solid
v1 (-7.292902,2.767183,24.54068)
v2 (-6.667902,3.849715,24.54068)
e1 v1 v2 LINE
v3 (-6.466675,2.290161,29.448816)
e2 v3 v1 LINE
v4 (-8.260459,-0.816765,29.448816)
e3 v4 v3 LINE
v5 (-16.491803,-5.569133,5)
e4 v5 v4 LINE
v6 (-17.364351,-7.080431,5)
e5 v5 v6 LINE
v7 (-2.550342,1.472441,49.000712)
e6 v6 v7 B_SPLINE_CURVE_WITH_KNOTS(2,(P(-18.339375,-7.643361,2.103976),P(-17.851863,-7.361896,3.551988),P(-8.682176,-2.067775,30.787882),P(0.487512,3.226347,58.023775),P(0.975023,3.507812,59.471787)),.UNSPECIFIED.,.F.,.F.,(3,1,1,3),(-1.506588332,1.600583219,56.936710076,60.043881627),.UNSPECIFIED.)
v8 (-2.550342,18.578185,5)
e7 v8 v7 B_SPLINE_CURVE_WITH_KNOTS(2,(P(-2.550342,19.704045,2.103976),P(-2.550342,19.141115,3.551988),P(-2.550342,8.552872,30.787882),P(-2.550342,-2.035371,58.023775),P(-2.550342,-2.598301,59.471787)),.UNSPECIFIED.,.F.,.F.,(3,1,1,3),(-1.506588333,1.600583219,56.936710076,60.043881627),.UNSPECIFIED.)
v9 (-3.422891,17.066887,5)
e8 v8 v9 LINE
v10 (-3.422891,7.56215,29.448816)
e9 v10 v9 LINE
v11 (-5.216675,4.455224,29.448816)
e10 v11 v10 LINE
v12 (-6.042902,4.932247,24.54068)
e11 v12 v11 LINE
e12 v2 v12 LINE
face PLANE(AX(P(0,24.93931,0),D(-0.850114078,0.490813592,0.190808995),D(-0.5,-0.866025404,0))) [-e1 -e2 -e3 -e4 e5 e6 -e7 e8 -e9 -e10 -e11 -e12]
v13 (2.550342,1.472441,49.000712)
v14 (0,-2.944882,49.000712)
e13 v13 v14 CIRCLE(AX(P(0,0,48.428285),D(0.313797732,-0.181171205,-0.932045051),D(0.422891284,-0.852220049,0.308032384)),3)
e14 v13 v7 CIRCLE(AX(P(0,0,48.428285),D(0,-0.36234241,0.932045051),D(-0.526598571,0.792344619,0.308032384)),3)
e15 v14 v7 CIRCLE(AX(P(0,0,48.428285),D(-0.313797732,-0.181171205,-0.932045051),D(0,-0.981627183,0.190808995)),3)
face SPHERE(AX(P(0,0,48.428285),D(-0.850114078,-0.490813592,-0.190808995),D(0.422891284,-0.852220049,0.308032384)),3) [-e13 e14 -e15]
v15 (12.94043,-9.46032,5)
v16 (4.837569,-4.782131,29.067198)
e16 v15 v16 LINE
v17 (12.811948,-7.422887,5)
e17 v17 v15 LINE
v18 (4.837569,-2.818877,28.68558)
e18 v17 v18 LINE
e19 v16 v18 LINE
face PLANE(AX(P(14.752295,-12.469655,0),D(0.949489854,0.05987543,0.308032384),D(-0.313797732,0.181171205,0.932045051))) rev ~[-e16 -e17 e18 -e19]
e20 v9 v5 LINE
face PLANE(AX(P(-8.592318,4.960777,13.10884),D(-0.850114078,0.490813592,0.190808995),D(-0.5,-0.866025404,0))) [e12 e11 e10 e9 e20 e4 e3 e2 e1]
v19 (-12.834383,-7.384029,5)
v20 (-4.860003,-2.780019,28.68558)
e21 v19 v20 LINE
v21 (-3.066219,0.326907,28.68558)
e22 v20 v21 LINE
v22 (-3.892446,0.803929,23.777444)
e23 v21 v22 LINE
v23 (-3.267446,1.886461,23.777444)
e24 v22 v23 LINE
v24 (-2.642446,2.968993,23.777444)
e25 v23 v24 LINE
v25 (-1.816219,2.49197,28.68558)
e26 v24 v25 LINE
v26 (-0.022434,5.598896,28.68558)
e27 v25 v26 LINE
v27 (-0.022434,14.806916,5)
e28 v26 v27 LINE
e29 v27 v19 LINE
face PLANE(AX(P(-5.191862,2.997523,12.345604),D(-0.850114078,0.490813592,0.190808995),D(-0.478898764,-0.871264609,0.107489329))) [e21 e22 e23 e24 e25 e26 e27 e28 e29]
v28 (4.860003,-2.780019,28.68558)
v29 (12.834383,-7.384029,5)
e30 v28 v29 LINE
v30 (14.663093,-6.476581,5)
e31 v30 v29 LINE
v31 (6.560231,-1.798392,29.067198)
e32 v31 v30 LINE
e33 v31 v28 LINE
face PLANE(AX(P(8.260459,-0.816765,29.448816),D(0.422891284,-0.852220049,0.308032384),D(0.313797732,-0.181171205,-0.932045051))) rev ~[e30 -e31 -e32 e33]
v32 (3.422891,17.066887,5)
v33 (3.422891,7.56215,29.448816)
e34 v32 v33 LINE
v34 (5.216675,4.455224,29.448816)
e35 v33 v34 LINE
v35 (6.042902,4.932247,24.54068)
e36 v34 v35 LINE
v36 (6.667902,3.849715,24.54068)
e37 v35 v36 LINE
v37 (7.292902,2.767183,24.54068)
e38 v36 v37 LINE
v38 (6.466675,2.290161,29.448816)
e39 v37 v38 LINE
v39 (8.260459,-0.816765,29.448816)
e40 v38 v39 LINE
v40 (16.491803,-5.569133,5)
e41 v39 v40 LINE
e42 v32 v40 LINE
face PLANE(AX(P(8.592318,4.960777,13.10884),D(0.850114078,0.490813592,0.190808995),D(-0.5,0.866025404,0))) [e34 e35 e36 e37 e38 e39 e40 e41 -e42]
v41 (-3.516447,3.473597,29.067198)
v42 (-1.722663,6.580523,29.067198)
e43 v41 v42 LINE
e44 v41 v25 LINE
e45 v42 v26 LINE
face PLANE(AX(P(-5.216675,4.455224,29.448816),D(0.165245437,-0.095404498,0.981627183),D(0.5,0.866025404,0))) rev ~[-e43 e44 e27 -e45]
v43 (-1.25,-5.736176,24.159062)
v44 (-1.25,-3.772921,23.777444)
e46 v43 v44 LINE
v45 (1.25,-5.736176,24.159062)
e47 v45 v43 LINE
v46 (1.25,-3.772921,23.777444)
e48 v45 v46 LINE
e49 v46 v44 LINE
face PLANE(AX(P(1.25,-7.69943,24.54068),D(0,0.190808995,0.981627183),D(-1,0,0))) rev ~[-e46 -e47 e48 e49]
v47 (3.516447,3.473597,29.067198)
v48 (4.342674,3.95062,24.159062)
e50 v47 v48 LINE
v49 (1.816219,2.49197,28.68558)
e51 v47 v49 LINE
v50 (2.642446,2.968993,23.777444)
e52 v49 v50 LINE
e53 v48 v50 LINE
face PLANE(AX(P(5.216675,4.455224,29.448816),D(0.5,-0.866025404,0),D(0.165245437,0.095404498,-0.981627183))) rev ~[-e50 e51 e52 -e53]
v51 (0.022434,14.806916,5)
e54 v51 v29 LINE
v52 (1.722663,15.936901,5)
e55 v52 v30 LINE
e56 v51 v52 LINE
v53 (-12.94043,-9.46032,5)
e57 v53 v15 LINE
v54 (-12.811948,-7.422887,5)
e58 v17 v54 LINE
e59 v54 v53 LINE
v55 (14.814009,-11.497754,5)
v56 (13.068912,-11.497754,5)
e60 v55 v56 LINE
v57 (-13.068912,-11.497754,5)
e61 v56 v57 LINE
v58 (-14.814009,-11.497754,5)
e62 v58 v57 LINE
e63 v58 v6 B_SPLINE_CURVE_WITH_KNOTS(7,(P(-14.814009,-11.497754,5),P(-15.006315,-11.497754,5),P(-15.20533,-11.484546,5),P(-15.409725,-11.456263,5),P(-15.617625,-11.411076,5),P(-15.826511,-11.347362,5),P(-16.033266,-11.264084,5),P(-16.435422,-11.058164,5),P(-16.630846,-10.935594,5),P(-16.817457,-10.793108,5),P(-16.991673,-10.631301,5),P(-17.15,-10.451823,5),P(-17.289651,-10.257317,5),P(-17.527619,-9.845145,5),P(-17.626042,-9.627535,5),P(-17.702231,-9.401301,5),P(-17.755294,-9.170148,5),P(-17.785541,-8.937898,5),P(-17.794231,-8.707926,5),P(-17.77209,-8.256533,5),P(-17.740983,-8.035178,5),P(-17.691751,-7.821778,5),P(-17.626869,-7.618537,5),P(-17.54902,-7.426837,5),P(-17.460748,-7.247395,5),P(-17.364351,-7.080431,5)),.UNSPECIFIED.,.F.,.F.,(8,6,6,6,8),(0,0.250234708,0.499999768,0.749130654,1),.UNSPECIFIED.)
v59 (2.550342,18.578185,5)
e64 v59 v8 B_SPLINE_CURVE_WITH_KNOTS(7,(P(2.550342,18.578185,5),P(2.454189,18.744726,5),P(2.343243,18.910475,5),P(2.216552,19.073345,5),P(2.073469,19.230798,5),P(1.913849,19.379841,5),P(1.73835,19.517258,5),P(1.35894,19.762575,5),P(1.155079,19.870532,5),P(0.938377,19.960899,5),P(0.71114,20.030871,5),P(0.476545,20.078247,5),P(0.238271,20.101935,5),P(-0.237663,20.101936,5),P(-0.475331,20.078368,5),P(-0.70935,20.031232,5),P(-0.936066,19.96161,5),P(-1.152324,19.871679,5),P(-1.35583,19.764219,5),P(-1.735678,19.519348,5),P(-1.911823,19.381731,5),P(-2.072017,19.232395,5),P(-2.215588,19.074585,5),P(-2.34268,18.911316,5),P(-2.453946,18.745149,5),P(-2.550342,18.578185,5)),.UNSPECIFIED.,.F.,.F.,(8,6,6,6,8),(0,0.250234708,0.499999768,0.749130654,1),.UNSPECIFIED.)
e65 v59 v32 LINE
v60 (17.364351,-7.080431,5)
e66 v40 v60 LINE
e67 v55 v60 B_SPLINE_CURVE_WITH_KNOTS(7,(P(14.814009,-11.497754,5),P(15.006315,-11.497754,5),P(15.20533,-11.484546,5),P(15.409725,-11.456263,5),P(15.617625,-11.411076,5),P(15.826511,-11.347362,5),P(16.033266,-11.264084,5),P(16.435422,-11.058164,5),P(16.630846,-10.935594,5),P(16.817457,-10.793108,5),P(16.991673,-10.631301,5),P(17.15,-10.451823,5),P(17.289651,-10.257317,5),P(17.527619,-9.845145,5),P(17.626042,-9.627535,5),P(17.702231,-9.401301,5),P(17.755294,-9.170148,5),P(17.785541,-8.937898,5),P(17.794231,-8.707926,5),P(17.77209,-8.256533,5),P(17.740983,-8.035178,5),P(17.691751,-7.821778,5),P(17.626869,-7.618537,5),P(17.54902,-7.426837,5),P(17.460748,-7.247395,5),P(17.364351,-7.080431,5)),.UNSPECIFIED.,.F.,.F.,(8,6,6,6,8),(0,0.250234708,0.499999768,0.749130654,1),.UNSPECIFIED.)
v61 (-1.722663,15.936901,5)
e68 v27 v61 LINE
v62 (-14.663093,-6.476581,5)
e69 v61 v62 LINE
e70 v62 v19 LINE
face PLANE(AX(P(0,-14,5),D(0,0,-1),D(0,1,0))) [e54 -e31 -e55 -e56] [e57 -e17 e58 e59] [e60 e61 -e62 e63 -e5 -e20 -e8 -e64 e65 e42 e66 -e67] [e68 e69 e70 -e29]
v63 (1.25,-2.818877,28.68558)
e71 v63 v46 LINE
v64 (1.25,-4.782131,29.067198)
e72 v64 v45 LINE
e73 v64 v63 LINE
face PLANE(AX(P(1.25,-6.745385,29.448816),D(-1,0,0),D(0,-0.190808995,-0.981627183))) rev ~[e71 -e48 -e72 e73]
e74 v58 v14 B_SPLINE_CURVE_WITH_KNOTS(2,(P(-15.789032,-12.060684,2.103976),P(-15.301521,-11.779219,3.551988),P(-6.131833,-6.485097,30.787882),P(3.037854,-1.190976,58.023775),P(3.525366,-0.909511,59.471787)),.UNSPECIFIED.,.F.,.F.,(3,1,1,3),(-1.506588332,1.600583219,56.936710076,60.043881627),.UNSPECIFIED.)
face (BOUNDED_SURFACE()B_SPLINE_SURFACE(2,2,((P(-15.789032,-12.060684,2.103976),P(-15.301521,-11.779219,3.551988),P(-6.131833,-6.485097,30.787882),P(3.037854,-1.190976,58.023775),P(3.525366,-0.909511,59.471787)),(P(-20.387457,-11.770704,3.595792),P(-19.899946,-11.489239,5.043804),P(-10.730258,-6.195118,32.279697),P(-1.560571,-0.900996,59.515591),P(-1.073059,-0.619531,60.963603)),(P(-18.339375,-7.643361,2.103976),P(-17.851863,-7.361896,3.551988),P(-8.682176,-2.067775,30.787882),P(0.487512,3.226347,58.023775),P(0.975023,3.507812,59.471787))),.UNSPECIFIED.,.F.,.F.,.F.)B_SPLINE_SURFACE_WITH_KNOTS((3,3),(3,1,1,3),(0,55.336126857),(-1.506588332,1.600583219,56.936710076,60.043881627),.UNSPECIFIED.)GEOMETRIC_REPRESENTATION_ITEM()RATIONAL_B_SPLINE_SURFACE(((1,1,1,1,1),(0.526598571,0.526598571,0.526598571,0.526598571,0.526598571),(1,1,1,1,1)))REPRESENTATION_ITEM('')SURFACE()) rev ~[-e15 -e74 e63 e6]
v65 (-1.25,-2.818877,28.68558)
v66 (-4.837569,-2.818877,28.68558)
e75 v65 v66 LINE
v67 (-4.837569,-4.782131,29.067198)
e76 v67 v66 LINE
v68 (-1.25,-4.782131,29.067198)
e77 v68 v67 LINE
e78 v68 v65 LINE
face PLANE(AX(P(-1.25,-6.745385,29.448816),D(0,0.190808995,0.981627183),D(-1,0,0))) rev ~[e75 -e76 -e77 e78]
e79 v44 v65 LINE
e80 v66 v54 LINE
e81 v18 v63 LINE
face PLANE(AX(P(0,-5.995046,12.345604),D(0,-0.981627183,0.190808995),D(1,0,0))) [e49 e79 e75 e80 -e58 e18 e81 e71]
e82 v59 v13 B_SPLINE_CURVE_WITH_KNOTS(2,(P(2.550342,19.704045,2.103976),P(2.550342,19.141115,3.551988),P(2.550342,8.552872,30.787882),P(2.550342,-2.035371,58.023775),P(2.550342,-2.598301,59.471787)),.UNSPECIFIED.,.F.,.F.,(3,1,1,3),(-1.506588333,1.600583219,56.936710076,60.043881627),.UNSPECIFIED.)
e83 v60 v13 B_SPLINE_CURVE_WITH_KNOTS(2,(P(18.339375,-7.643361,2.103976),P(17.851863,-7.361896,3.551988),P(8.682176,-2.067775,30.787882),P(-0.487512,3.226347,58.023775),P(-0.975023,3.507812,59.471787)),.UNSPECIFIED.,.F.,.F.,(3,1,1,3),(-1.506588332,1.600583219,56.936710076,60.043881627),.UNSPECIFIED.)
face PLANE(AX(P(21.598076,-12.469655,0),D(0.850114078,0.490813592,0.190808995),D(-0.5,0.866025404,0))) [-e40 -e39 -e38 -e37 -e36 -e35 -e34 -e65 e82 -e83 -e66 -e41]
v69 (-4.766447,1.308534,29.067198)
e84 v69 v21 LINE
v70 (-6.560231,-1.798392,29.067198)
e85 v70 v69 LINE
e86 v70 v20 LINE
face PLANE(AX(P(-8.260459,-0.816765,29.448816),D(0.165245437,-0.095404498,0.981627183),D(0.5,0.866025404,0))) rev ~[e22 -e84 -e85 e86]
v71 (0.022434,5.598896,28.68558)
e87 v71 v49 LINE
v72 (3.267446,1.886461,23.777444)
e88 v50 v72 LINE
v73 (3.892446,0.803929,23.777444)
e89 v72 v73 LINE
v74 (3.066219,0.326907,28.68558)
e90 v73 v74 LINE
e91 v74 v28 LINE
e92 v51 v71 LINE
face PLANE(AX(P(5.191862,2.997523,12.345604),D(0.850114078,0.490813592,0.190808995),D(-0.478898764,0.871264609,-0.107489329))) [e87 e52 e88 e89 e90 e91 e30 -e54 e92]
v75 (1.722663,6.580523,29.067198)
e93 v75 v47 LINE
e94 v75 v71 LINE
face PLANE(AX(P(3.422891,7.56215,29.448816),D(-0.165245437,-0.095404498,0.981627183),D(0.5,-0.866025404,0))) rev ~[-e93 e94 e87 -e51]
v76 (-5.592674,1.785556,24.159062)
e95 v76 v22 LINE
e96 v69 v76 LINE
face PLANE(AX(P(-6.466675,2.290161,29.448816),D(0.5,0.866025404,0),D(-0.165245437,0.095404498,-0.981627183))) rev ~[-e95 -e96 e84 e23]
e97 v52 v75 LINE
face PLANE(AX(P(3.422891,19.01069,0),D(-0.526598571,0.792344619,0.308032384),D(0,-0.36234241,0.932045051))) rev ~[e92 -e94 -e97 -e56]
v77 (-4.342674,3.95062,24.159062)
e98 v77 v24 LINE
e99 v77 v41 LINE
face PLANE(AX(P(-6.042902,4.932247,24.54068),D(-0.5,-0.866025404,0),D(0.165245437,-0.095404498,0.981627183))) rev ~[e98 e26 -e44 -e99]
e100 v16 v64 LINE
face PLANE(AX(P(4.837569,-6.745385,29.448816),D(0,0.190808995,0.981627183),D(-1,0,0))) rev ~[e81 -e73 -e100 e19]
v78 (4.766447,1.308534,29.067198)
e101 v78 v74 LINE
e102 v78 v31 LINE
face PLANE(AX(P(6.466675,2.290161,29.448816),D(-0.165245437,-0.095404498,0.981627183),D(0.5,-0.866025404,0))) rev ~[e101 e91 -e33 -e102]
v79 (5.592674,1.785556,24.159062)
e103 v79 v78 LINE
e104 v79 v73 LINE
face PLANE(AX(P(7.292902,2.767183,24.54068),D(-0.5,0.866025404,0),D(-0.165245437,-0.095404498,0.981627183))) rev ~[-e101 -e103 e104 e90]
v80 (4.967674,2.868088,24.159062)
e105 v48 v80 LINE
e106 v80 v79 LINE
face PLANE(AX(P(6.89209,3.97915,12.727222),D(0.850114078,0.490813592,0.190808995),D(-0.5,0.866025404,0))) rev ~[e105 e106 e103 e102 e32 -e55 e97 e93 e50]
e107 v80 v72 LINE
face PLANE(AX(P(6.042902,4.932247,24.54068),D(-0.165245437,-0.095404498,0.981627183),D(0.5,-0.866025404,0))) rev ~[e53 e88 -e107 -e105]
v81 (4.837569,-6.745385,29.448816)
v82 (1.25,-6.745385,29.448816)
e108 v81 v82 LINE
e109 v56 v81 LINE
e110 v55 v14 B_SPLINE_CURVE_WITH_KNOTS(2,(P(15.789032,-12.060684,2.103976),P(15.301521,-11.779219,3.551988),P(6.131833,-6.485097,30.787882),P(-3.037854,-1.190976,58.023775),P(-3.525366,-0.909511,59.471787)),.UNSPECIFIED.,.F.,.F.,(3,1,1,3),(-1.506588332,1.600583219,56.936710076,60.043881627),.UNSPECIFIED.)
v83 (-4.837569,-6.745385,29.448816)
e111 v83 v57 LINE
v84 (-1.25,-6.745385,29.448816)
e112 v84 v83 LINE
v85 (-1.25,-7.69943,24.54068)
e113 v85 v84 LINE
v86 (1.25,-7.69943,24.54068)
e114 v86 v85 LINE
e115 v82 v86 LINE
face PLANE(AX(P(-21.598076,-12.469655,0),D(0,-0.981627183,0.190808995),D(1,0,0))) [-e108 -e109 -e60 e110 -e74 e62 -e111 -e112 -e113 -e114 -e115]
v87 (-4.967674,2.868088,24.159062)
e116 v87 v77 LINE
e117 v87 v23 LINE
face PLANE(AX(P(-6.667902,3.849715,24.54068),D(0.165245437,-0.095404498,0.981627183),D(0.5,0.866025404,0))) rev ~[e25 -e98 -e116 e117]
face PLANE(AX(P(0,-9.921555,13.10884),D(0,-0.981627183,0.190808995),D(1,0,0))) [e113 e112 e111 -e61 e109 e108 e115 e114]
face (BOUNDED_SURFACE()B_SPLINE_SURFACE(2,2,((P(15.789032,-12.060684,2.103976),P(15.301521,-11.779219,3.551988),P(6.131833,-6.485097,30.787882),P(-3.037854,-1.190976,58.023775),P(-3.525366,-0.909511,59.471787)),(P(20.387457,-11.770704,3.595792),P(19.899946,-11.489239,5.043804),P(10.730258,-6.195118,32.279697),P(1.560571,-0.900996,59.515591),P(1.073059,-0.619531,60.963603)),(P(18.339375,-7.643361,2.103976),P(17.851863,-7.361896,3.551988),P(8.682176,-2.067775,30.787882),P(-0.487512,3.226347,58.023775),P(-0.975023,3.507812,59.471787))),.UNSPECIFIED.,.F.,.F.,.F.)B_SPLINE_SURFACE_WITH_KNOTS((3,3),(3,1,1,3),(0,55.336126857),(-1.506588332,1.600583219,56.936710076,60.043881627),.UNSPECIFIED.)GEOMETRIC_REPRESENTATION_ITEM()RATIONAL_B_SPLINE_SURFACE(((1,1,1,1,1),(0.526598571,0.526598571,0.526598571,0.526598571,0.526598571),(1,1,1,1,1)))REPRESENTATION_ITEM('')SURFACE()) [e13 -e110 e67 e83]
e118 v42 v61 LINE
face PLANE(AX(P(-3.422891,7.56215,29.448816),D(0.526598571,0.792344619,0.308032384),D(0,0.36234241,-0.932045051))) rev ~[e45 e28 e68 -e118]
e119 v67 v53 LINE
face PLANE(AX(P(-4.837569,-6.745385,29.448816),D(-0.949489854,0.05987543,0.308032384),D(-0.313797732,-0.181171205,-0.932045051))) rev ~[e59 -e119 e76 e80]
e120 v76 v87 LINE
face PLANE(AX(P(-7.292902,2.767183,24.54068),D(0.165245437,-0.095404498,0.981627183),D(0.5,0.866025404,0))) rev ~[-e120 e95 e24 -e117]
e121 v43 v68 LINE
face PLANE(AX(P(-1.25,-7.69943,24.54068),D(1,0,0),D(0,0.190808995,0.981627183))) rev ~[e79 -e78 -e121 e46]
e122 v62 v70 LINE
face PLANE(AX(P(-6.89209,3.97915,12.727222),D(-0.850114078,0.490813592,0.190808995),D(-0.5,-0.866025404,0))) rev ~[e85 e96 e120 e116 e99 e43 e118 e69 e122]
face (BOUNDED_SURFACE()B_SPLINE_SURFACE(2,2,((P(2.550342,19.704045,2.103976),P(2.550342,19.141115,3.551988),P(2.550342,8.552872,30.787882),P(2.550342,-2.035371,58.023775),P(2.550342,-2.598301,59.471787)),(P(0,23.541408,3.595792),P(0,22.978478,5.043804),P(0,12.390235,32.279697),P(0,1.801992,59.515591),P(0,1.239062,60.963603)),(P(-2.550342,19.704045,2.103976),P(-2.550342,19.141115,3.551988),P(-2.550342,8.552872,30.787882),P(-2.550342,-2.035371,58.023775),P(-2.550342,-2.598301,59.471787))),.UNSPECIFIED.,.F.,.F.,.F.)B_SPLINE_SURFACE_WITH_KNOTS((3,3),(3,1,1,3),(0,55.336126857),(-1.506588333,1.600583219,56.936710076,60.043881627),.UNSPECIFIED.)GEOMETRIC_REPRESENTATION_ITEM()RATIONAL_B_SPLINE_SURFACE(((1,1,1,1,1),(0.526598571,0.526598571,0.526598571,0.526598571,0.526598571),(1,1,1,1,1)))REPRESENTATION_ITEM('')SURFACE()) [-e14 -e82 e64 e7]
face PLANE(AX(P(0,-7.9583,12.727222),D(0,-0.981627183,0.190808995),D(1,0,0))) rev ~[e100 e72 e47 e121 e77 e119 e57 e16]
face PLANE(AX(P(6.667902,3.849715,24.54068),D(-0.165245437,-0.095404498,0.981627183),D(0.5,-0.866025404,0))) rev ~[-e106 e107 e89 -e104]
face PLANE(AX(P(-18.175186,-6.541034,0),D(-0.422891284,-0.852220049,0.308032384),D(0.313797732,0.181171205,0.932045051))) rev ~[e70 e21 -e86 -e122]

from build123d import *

# Parameters (mm, degrees)
F3_DEPTH        = 4
F5_DEPTH        = 4
F7_DEPTH        = 4
F8_DEPTH        = 2
F8_COPIES_COUNT = 3
F10_W           = 40
F10_H           = 6
F11_DEPTH       = 25
F11_DEPTH_BACK  = 25
F12_R           = 3


# Not quite as in the source:
# - an extrude whose draft closes it to a point is written as a loft to that point
# - a feature of the source that left no trace in its solid (it failed there, or was rolled back) is left out
# - a pattern or mirror of a feature is missing from the dataset's text; its kind, count and spacing are read off the source's solid


with BuildPart() as f0:
    # F13 (on Top) → F0 section 0
    with BuildSketch(Plane.XY, mode=Mode.PRIVATE) as f0_s0:
        Polygon((-21.5980762114, -12.4696551146), (21.5980762114, -12.4696551146), (0, 24.9393102292), align=None)
    loft([f0_s0.sketch, Vertex(0, 0, 64.1508142976)], ruled=True)

    # F1 (on face) → F3 (cut)
    with BuildSketch(Plane(origin=(0, -12.0156590044, 2.3356075118), x_dir=(1, 0, 0), z_dir=(0, -0.9816271834, 0.1908089954))):
        Polygon((-4.8375685578, 27.6206776349), (-14.7522947938, -2.3793223651), (0, -2.3793223651), (14.7522947938, -2.3793223651), (4.8375685578, 27.6206776349), (1.25, 27.6206776349), (1.25, 22.6206776349), (0, 22.6206776349), (-1.25, 22.6206776349), (-1.25, 27.6206776349), align=None)
    extrude(amount=-F3_DEPTH, mode=Mode.SUBTRACT)

    # F4 (on face) → F5 (cut)
    with BuildSketch(Plane(origin=(10.4058659411, 6.0078295022, 2.3356075118), x_dir=(-0.4788987638, 0.8712646086, -0.1074893292), z_dir=(0.8501140779, 0.4908135917, 0.1908089954))):
        Polygon((-7.8329752774, 26.9248658467), (-14.40304573, -3.980408308), (0.2605385928, -2.3650147058), (14.9241229157, -0.7496211036), (1.7839820104, 27.9843047215), (-1.7820133006, 27.5914617519), (-1.2345074295, 22.6215284202), (-2.4769907625, 22.4846519525), (-3.7194740954, 22.3477754847), (-4.2669799664, 27.3177088164), align=None)
    extrude(amount=-F5_DEPTH, mode=Mode.SUBTRACT)

    # F6 (on face) → F7 (cut)
    with BuildSketch(Plane(origin=(-10.4058659411, 6.0078295022, 2.3356075118), x_dir=(-0.4788987638, -0.8712646086, 0.1074893292), z_dir=(-0.8501140779, 0.4908135917, 0.1908089954))):
        Polygon((-1.7839820104, 27.9843047215), (-14.9241229157, -0.7496211036), (-0.2605385928, -2.3650147058), (14.40304573, -3.980408308), (7.8329752774, 26.9248658467), (4.2669799664, 27.3177088164), (3.7194740954, 22.3477754847), (2.4769907625, 22.4846519525), (1.2345074295, 22.6215284202), (1.7820133006, 27.5914617519), align=None)
    extrude(amount=-F7_DEPTH, mode=Mode.SUBTRACT)

    # F1 (on face) → F8 (join)
    with BuildSketch(Plane(origin=(0, -12.0156590044, 2.3356075118), x_dir=(1, 0, 0), z_dir=(0, -0.9816271834, 0.1908089954))):
        Polygon((-4.8375685578, 27.6206776349), (-14.7522947938, -2.3793223651), (0, -2.3793223651), (14.7522947938, -2.3793223651), (4.8375685578, 27.6206776349), (1.25, 27.6206776349), (1.25, 22.6206776349), (0, 22.6206776349), (-1.25, 22.6206776349), (-1.25, 27.6206776349), align=None)
    f8 = extrude(amount=-F8_DEPTH)

    # F8_copies: F8 ×3 about axis
    f8_copies_axis = Axis((0, 0, 0), (0, 0, 1))
    for i in range(1, F8_COPIES_COUNT):
        add(f8.rotate(f8_copies_axis, i * 360 / F8_COPIES_COUNT))

    # F10 (on Right) → F11 (cut, two sides)
    with BuildSketch(Plane.YZ) as f11_sk:
        with Locations((6, 2)):
            Rectangle(F10_W, F10_H)
    extrude(amount=-F11_DEPTH, mode=Mode.SUBTRACT)
    extrude(f11_sk.sketch, amount=F11_DEPTH_BACK, mode=Mode.SUBTRACT)

    # F12
    f12_edges = [f0.edges().sort_by_distance(p)[0] for p in [
        (-9.957347, -5.748877, 34.575407),
        (9.957347, -5.748877, 34.575407),
        (0, 11.497754, 34.575407),
    ]]
    fillet(f12_edges, radius=F12_R)


solid = f0.part
